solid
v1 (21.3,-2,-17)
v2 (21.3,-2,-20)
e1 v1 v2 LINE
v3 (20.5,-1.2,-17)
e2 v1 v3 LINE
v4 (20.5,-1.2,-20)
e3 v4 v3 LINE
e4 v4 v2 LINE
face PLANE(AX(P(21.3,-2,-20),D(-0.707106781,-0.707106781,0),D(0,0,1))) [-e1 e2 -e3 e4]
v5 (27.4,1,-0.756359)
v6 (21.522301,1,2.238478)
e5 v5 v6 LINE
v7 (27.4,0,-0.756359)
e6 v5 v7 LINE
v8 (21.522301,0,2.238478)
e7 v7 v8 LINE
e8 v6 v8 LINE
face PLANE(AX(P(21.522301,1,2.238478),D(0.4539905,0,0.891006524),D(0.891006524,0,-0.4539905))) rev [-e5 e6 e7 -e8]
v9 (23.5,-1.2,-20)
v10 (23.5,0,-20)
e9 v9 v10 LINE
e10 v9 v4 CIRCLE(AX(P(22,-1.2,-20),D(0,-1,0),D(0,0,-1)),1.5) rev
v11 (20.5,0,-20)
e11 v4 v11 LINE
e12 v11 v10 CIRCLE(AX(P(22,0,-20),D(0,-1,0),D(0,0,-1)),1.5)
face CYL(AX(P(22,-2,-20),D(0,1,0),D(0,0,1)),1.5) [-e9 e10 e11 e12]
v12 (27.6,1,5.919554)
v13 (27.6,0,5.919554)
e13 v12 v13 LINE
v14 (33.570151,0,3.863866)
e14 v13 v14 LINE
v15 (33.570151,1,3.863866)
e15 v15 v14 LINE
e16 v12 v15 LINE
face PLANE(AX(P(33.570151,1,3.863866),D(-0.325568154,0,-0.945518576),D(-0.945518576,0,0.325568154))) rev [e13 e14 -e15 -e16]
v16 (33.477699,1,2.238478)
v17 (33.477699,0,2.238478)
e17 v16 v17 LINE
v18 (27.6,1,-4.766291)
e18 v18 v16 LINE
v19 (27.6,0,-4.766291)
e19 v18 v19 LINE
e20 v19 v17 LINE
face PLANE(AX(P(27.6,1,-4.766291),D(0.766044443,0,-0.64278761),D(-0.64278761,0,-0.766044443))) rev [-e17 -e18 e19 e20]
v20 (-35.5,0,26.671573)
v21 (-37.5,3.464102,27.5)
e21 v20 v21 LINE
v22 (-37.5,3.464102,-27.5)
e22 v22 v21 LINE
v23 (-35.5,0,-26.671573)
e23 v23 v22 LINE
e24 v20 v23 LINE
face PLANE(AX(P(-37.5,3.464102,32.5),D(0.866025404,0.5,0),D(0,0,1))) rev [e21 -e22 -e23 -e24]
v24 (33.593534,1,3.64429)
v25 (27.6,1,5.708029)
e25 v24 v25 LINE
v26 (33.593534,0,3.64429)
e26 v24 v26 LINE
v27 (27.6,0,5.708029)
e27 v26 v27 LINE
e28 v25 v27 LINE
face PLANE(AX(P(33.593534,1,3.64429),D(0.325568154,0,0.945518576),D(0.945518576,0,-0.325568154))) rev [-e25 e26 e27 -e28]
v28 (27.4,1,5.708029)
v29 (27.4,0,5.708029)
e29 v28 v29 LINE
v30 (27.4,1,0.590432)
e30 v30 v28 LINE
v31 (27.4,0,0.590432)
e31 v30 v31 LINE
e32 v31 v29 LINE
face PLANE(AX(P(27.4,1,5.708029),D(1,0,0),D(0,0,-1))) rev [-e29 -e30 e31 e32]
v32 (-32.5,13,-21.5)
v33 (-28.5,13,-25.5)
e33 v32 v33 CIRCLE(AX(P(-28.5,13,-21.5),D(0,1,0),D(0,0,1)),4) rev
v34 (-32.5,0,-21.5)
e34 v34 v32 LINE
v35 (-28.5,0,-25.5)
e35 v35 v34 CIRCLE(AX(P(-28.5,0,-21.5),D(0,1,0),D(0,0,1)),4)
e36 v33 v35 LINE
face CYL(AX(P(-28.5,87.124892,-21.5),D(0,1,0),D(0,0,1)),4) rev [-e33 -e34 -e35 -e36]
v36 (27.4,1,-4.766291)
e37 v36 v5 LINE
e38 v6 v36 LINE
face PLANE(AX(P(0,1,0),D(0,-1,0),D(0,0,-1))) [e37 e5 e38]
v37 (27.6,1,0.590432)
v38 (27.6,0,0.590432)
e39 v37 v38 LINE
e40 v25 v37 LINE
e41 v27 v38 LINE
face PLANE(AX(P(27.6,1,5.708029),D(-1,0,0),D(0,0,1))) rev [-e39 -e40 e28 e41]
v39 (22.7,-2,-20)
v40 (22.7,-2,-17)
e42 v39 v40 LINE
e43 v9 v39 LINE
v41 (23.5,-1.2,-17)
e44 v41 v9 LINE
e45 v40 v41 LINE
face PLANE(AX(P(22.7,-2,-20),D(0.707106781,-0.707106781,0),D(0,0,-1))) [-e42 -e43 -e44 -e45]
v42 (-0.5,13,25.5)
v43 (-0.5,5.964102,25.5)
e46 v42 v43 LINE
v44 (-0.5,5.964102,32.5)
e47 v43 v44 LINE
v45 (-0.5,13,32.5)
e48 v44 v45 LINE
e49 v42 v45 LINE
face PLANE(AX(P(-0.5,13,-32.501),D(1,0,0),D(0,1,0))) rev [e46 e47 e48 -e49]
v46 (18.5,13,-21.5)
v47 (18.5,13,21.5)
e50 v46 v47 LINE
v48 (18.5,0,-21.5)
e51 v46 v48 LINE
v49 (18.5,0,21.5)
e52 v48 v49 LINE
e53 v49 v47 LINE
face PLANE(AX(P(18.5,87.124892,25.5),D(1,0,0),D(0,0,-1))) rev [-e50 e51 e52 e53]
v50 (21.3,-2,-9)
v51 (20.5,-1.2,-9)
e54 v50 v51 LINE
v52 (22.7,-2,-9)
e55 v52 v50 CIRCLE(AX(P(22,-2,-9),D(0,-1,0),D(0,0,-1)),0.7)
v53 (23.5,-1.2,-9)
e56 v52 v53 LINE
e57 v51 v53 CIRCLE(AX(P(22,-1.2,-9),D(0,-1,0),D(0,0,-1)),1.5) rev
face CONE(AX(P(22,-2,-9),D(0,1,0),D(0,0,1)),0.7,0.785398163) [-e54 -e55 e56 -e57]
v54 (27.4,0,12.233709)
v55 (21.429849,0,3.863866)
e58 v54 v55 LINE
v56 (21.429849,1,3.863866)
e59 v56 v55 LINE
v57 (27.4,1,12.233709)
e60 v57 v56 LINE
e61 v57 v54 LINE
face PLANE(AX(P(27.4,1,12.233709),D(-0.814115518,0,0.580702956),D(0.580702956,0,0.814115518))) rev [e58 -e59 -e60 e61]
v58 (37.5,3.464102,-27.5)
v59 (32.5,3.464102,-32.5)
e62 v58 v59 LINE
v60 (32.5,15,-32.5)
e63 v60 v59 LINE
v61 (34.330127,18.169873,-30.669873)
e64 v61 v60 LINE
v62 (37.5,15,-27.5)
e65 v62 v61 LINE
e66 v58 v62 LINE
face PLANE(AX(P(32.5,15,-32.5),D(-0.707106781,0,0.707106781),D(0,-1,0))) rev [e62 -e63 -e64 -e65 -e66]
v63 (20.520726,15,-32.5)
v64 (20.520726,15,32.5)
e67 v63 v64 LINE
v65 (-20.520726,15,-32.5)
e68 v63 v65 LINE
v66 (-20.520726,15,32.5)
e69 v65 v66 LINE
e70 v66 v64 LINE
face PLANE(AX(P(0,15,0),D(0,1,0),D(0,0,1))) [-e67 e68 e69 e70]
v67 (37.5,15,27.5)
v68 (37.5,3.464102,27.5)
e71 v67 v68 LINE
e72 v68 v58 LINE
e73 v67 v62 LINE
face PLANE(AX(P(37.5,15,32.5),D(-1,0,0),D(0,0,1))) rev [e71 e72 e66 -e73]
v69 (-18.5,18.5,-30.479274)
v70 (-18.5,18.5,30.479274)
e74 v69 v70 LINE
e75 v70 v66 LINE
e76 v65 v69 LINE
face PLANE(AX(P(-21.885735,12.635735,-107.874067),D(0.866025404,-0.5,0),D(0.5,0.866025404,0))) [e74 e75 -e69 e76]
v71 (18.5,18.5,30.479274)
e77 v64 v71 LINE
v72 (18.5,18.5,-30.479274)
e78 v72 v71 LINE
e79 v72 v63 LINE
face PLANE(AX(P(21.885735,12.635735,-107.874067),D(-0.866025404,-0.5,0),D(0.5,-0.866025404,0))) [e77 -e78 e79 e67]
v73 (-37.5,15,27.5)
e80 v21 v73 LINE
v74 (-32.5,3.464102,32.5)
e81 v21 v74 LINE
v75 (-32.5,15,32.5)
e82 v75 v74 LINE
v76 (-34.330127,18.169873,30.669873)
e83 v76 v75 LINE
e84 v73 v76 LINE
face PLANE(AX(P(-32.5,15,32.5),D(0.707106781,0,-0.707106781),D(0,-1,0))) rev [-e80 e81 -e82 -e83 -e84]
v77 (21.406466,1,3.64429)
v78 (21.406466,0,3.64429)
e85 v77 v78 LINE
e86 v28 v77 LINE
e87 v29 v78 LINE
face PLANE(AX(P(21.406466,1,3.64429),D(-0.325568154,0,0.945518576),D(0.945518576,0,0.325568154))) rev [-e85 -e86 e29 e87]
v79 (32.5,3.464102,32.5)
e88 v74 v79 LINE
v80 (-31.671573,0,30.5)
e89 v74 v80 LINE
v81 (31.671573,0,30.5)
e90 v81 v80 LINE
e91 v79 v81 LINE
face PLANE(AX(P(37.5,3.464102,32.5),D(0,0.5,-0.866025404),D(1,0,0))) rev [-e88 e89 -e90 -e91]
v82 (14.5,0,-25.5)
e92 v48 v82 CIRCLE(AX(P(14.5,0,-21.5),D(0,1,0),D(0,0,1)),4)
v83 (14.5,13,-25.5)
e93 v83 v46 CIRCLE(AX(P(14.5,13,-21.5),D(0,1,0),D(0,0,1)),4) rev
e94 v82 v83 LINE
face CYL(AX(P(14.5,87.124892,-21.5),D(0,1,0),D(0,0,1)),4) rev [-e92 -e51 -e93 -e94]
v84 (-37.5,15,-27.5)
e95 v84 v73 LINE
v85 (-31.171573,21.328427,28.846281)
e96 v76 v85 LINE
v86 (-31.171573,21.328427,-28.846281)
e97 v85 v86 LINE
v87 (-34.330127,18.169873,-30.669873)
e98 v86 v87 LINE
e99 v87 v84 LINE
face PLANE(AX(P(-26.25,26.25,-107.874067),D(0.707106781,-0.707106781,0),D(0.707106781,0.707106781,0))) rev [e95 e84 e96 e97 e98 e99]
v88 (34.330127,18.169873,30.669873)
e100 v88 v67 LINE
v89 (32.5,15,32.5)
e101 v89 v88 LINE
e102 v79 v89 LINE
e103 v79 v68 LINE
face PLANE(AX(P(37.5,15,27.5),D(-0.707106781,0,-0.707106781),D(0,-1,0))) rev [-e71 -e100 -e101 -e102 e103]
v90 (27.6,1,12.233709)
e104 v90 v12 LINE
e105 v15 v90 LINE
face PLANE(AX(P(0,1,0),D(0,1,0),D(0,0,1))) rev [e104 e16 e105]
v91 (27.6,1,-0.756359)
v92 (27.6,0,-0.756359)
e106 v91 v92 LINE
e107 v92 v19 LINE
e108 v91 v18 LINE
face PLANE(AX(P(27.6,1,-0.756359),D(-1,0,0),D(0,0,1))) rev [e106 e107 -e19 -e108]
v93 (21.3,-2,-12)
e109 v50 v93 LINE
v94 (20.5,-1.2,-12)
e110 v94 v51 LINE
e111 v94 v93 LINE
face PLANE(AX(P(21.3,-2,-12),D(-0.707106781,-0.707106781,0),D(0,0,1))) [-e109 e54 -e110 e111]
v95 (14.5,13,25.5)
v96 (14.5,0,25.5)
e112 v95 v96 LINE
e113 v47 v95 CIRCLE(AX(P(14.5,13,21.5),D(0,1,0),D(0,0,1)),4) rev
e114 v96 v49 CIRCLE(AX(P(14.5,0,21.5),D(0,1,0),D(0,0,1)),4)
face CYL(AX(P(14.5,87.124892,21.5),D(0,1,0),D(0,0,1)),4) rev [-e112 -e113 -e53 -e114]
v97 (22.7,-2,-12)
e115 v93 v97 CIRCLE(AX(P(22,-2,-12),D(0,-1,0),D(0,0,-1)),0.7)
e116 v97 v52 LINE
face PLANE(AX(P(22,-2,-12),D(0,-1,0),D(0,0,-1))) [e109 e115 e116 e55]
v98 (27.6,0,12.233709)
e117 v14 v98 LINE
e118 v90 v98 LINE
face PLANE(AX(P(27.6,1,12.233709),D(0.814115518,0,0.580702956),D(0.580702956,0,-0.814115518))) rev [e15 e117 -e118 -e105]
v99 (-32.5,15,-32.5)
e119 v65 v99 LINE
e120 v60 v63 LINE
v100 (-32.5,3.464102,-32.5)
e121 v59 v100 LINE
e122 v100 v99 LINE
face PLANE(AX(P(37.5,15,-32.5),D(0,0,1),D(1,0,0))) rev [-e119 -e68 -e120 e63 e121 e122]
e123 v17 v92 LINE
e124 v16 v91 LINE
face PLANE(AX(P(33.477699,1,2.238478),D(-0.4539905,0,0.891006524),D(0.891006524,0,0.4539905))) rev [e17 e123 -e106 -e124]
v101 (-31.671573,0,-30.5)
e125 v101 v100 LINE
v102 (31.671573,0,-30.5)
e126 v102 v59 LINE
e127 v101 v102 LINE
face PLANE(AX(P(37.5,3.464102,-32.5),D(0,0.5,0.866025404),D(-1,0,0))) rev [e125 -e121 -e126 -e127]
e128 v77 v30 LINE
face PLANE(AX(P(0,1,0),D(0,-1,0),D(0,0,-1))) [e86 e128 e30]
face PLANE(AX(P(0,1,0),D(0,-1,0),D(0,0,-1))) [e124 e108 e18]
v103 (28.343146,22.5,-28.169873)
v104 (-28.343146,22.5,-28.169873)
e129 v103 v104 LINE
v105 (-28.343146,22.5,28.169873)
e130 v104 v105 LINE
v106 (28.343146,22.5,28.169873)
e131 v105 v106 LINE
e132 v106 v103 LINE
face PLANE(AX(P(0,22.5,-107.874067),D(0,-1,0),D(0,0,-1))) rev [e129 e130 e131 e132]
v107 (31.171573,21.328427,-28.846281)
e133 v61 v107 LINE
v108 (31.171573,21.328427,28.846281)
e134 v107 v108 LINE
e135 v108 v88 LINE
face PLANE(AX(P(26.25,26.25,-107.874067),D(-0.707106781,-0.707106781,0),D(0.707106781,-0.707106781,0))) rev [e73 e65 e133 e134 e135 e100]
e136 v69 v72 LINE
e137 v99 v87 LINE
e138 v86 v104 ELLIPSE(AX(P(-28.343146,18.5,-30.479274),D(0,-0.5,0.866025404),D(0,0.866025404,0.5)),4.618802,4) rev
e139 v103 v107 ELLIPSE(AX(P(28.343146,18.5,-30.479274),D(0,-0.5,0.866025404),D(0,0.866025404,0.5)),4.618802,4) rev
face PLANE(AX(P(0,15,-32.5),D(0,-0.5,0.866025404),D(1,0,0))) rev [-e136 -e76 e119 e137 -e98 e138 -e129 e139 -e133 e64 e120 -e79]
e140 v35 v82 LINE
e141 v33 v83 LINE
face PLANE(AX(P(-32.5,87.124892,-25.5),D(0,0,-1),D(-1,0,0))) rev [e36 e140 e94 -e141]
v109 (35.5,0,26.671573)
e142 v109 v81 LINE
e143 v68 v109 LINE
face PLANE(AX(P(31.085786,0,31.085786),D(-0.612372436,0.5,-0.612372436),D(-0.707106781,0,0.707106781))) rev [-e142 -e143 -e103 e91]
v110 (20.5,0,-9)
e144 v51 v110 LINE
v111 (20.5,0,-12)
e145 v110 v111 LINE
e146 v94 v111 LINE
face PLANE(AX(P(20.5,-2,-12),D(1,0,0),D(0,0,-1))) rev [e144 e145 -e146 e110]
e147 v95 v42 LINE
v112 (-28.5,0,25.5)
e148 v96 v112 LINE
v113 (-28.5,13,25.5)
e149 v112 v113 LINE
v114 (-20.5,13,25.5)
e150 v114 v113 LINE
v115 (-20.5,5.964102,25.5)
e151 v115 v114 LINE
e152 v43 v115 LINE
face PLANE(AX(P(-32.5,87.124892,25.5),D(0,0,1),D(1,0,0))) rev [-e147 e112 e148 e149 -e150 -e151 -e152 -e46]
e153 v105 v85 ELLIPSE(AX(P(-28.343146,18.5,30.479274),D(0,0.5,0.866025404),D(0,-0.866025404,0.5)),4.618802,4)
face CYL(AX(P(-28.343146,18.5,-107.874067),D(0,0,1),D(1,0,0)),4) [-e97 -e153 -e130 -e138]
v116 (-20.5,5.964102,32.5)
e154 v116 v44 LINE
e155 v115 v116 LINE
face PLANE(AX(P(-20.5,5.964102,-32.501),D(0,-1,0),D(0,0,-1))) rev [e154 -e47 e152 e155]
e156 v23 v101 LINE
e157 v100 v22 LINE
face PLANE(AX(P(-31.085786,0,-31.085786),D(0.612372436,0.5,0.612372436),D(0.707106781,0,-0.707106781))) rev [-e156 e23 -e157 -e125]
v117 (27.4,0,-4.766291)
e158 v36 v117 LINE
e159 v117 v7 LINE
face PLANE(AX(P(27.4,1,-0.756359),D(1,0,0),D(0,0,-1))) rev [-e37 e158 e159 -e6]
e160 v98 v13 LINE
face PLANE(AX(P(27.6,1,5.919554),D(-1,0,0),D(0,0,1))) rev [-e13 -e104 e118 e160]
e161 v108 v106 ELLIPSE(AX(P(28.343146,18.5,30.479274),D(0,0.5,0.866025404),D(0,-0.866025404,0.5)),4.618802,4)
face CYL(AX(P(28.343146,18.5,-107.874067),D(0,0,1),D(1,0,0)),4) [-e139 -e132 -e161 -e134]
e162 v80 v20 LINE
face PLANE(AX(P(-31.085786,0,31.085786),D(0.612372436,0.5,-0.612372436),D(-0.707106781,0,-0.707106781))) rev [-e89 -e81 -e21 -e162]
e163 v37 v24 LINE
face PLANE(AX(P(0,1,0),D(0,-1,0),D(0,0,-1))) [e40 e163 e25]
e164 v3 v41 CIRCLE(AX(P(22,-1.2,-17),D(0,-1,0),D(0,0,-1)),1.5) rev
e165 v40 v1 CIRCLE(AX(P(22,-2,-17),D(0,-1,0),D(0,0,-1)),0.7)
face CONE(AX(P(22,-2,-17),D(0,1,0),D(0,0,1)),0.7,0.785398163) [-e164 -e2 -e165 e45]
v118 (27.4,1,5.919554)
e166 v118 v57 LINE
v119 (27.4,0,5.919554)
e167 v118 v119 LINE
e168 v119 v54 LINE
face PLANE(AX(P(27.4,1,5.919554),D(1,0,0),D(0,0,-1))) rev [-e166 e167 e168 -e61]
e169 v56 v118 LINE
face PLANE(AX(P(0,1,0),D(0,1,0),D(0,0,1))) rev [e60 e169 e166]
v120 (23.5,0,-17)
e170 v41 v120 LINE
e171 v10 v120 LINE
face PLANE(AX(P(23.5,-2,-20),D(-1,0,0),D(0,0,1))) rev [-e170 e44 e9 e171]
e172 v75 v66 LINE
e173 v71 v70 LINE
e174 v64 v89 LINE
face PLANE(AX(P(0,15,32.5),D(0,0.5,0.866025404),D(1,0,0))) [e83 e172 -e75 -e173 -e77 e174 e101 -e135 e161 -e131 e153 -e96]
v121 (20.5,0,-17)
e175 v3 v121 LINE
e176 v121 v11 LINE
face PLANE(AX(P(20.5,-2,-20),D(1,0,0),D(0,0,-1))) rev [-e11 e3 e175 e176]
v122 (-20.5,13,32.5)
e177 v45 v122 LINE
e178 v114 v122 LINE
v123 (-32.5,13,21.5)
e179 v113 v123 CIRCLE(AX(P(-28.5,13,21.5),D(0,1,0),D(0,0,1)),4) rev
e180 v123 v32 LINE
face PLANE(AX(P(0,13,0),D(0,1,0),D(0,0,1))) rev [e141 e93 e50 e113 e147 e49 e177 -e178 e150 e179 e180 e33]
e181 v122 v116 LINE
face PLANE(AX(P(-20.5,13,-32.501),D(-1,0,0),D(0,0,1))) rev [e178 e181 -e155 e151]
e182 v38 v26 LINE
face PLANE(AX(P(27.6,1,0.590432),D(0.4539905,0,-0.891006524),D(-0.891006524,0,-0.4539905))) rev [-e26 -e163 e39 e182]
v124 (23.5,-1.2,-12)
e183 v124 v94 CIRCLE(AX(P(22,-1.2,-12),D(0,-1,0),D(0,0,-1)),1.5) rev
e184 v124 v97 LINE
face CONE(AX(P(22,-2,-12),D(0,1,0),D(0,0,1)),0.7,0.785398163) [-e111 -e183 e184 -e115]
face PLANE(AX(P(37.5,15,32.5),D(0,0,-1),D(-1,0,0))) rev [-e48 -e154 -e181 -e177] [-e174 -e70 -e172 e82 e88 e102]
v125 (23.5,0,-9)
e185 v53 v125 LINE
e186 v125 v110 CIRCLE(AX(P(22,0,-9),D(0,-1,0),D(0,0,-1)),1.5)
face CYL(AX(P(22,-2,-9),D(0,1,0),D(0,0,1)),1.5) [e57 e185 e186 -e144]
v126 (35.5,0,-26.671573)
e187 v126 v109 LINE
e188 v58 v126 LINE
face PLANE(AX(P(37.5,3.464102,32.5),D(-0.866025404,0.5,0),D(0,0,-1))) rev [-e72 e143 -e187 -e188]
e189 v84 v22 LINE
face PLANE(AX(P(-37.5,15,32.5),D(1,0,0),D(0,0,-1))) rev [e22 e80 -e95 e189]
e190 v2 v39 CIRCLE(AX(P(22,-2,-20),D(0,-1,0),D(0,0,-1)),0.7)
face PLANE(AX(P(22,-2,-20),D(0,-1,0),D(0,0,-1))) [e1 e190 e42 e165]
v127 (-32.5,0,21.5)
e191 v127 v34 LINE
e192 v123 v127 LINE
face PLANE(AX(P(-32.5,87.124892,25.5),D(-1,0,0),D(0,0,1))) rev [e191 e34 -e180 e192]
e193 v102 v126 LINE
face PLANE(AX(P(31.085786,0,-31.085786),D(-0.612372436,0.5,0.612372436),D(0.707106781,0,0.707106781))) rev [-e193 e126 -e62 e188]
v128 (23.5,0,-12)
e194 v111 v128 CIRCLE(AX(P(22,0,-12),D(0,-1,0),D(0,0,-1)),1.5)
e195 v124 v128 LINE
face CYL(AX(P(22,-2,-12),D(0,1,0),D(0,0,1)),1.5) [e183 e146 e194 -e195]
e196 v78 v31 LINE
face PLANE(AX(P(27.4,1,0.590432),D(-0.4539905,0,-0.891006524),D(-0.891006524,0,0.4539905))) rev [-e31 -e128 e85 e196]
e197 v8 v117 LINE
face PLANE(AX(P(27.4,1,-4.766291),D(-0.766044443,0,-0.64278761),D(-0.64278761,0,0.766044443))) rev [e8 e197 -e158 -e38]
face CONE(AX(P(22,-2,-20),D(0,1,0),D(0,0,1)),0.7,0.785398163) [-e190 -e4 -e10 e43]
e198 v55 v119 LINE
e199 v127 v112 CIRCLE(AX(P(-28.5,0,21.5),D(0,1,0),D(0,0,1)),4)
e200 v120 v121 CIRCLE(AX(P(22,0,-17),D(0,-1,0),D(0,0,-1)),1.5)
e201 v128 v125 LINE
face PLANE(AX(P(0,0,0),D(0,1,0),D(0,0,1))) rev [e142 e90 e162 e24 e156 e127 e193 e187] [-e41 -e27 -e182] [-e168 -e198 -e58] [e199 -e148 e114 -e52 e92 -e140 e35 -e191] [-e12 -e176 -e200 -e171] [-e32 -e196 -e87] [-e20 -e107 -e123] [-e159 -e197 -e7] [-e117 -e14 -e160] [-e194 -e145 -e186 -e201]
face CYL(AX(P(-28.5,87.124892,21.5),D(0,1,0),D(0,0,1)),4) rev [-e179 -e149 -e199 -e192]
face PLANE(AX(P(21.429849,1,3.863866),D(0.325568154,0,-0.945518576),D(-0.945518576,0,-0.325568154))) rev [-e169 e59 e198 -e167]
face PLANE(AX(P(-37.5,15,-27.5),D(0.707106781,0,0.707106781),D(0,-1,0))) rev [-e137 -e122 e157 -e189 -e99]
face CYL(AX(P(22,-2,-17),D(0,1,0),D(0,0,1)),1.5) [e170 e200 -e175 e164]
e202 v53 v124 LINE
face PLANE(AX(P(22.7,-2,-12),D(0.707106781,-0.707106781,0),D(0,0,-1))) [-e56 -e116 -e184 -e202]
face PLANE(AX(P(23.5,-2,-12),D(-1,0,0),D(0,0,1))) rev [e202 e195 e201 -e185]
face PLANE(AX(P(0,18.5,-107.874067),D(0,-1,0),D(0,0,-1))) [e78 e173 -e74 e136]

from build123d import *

# Parameters (mm, degrees)
SKETCH2_W           = 75
SKETCH2_H           = 65
BOSS_EXTRUDE1_DEPTH = 15
BOSS_EXTRUDE3_START = -5
BOSS_EXTRUDE3_DEPTH = 55
CHAMFER1_SIZE       = 5
CHAMFER1_SIZE_2     = 8.660254038
CHAMFER2_SIZE       = 8.660254038
CHAMFER2_SIZE_2     = 5
FILLET3_R           = 4
SKETCH5_W           = 51
SKETCH5_H           = 51
CUT_EXTRUDE2_DEPTH  = 13
CHAMFER3_SIZE       = 5
FILLET4_R           = 4
CUT_EXTRUDE3_DEPTH  = 1
BOSS_EXTRUDE4_DEPTH = 2
CHAMFER5_SIZE       = 0.8
CHAMFER6_SIZE       = 2
CHAMFER6_SIZE2      = 3.464101615
CUT_EXTRUDE4_REACH  = 80.342
SKETCH10_W          = 20
SKETCH10_H          = 7.035898385


with BuildPart() as part:
    # Sketch2 → Boss-Extrude1 (new body)
    with BuildSketch(Plane(origin=(0, 0, 0), x_dir=(1, 0, 0), z_dir=(0, 1, 0))):
        Rectangle(SKETCH2_W, SKETCH2_H)
    extrude(amount=BOSS_EXTRUDE1_DEPTH)

    # Sketch4 → Boss-Extrude3 (add)
    with BuildSketch(Plane.XY.offset(32.5).offset(BOSS_EXTRUDE3_START)):
        Polygon((-30, 22.5), (-37.5, 15), (-20.520725942, 15), (-18.5, 18.5), (18.5, 18.5), (20.520725942, 15), (37.5, 15), (30, 22.5), align=None)
    extrude(amount=-BOSS_EXTRUDE3_DEPTH)

    # Chamfer1
    # the kernel refuses this chamfer: 8.660254038, 5 mm, written as the material it adds along each edge
    with BuildSketch(Plane(origin=(-37.5, 15, -27.5), x_dir=(0, -0.05789386240267149, -0.9983227437537926), z_dir=(1, 0, 0))) as chamfer1_piece_1_section:
        Polygon((CHAMFER1_SIZE * 0.998322743754, CHAMFER1_SIZE * 0.0578938624027), (-CHAMFER1_SIZE_2 * 0.0578938624016, CHAMFER1_SIZE_2 * 0.998322743736), (0, 0), align=None)
    chamfer1_piece_1 = extrude(amount=39.384093911, mode=Mode.PRIVATE)
    chamfer1_piece_1 = split(chamfer1_piece_1, bisect_by=Plane(origin=(-27.856272833, 16.457627442, -32.5), z_dir=(0, 0, 1)), keep=Keep.TOP, mode=Mode.PRIVATE)
    chamfer1_piece_1 = split(chamfer1_piece_1, bisect_by=Plane(origin=(-21.723441468, 12.916835603, -29.537993549), z_dir=(-0.8660254037844403, 0.49999999999999734, 0)), keep=Keep.TOP, mode=Mode.PRIVATE)
    chamfer1_piece_1 = split(chamfer1_piece_1, bisect_by=Plane(origin=(-31.949322695, 20.550677305, -29.537993549), z_dir=(0.7071067811865487, -0.7071067811865464, 0)), keep=Keep.TOP, mode=Mode.PRIVATE)
    chamfer1_piece_1 = split(chamfer1_piece_1, bisect_by=Plane(origin=(-27.856272833, 18.5, -29.537993549), z_dir=(0, -1, 0)), keep=Keep.TOP, mode=Mode.PRIVATE)
    add(chamfer1_piece_1)
    with BuildSketch(Plane(origin=(-37.5, 15, -27.5), x_dir=(0, -0.05789386240267149, -0.9983227437537926), z_dir=(1, 0, 0))) as chamfer1_piece_2_section:
        Polygon((CHAMFER1_SIZE * 0.998322743754, CHAMFER1_SIZE * 0.0578938624027), (-CHAMFER1_SIZE_2 * 0.0578938624016, CHAMFER1_SIZE_2 * 0.998322743736), (0, 0), align=None)
    chamfer1_piece_2 = extrude(amount=39.384093911, mode=Mode.PRIVATE)
    chamfer1_piece_2 = split(chamfer1_piece_2, bisect_by=Plane(origin=(-19.426417994, 16.895396965, -28.430435977), z_dir=(-0.8660254037844403, 0.49999999999999734, 0)), keep=Keep.TOP, mode=Mode.PRIVATE)
    chamfer1_piece_2 = split(chamfer1_piece_2, bisect_by=Plane(origin=(-28.690098083, 23.809901917, -28.430435977), z_dir=(0.7071067811865487, -0.7071067811865464, 0)), keep=Keep.TOP, mode=Mode.PRIVATE)
    chamfer1_piece_2 = split(chamfer1_piece_2, bisect_by=Plane(origin=(-24.984626048, 22.5, -28.430435977), z_dir=(0, -1, 0)), keep=Keep.TOP, mode=Mode.PRIVATE)
    chamfer1_piece_2 = split(chamfer1_piece_2, bisect_by=Plane(origin=(-24.984626048, 18.5, -28.430435977), z_dir=(0, 1, 0)), keep=Keep.TOP, mode=Mode.PRIVATE)
    add(chamfer1_piece_2)
    with BuildSketch(Plane(origin=(-37.5, 15, -27.5), x_dir=(0, -0.05789386240267149, -0.9983227437537926), z_dir=(1, 0, 0))) as chamfer1_piece_3_section:
        Polygon((CHAMFER1_SIZE * 0.998322743754, CHAMFER1_SIZE * 0.0578938624027), (-CHAMFER1_SIZE_2 * 0.0578938624016, CHAMFER1_SIZE_2 * 0.998322743736), (0, 0), align=None)
    chamfer1_piece_3 = extrude(amount=39.384093911, mode=Mode.PRIVATE)
    chamfer1_piece_3 = split(chamfer1_piece_3, bisect_by=Plane(origin=(-15.142166091, 24.315938934, -28.430858153), z_dir=(0.8660254037844403, -0.49999999999999734, 0)), keep=Keep.TOP, mode=Mode.PRIVATE)
    chamfer1_piece_3 = split(chamfer1_piece_3, bisect_by=Plane(origin=(-7.845197519, 22.5, -28.430858153), z_dir=(0, -1, 0)), keep=Keep.TOP, mode=Mode.PRIVATE)
    chamfer1_piece_3 = split(chamfer1_piece_3, bisect_by=Plane(origin=(-7.845197519, 18.5, -28.430858153), z_dir=(0, 1, 0)), keep=Keep.TOP, mode=Mode.PRIVATE)
    add(chamfer1_piece_3)
    with BuildSketch(Plane(origin=(-1.884093911, 15, -27.5), x_dir=(0, -0.05789386240267149, -0.9983227437537926), z_dir=(1, 0, 0))) as chamfer1_piece_4_section:
        Polygon((CHAMFER1_SIZE * 0.998322743754, CHAMFER1_SIZE * 0.0578938624027), (-CHAMFER1_SIZE_2 * 0.0578938624016, CHAMFER1_SIZE_2 * 0.998322743736), (0, 0), align=None)
    chamfer1_piece_4 = extrude(amount=39.384093911, mode=Mode.PRIVATE)
    chamfer1_piece_4 = split(chamfer1_piece_4, bisect_by=Plane(origin=(15.142166091, 24.315938934, -28.430858153), z_dir=(-0.8660254037844395, -0.4999999999999986, 0)), keep=Keep.TOP, mode=Mode.PRIVATE)
    chamfer1_piece_4 = split(chamfer1_piece_4, bisect_by=Plane(origin=(7.845197519, 22.5, -28.430858153), z_dir=(0, -1, 0)), keep=Keep.TOP, mode=Mode.PRIVATE)
    chamfer1_piece_4 = split(chamfer1_piece_4, bisect_by=Plane(origin=(7.845197519, 18.5, -28.430858153), z_dir=(0, 1, 0)), keep=Keep.TOP, mode=Mode.PRIVATE)
    add(chamfer1_piece_4)
    with BuildSketch(Plane(origin=(-1.884093911, 15, -27.5), x_dir=(0, -0.05789386240267149, -0.9983227437537926), z_dir=(1, 0, 0))) as chamfer1_piece_5_section:
        Polygon((CHAMFER1_SIZE * 0.998322743754, CHAMFER1_SIZE * 0.0578938624027), (-CHAMFER1_SIZE_2 * 0.0578938624016, CHAMFER1_SIZE_2 * 0.998322743736), (0, 0), align=None)
    chamfer1_piece_5 = extrude(amount=39.384093911, mode=Mode.PRIVATE)
    chamfer1_piece_5 = split(chamfer1_piece_5, bisect_by=Plane(origin=(21.723441468, 12.916835603, -29.537993549), z_dir=(0.8660254037844395, 0.4999999999999986, 0)), keep=Keep.TOP, mode=Mode.PRIVATE)
    chamfer1_piece_5 = split(chamfer1_piece_5, bisect_by=Plane(origin=(27.856272833, 16.457627442, -32.5), z_dir=(0, 0, 1)), keep=Keep.TOP, mode=Mode.PRIVATE)
    chamfer1_piece_5 = split(chamfer1_piece_5, bisect_by=Plane(origin=(31.949322695, 20.550677305, -29.537993549), z_dir=(-0.7071067811865489, -0.7071067811865462, 0)), keep=Keep.TOP, mode=Mode.PRIVATE)
    chamfer1_piece_5 = split(chamfer1_piece_5, bisect_by=Plane(origin=(27.856272833, 18.5, -29.537993549), z_dir=(0, -1, 0)), keep=Keep.TOP, mode=Mode.PRIVATE)
    add(chamfer1_piece_5)
    with BuildSketch(Plane(origin=(-1.884093911, 15, -27.5), x_dir=(0, -0.05789386240267149, -0.9983227437537926), z_dir=(1, 0, 0))) as chamfer1_piece_6_section:
        Polygon((CHAMFER1_SIZE * 0.998322743754, CHAMFER1_SIZE * 0.0578938624027), (-CHAMFER1_SIZE_2 * 0.0578938624016, CHAMFER1_SIZE_2 * 0.998322743736), (0, 0), align=None)
    chamfer1_piece_6 = extrude(amount=39.384093911, mode=Mode.PRIVATE)
    chamfer1_piece_6 = split(chamfer1_piece_6, bisect_by=Plane(origin=(19.426417994, 16.895396965, -28.430435977), z_dir=(0.8660254037844395, 0.4999999999999986, 0)), keep=Keep.TOP, mode=Mode.PRIVATE)
    chamfer1_piece_6 = split(chamfer1_piece_6, bisect_by=Plane(origin=(28.690098083, 23.809901917, -28.430435977), z_dir=(-0.7071067811865489, -0.7071067811865462, 0)), keep=Keep.TOP, mode=Mode.PRIVATE)
    chamfer1_piece_6 = split(chamfer1_piece_6, bisect_by=Plane(origin=(24.984626048, 22.5, -28.430435977), z_dir=(0, -1, 0)), keep=Keep.TOP, mode=Mode.PRIVATE)
    chamfer1_piece_6 = split(chamfer1_piece_6, bisect_by=Plane(origin=(24.984626048, 18.5, -28.430435977), z_dir=(0, 1, 0)), keep=Keep.TOP, mode=Mode.PRIVATE)
    add(chamfer1_piece_6)

    # Chamfer2
    # the kernel refuses this chamfer: 8.660254038, 5 mm, written as the material it adds along each edge
    with BuildSketch(Plane(origin=(-37.5, 15, 27.5), x_dir=(0, 0.9998132206222078, -0.019326765612700497), z_dir=(1, 0, 0))) as chamfer2_piece_1_section:
        Polygon((CHAMFER2_SIZE * 0.999813220604, CHAMFER2_SIZE * 0.0193267656124), (-CHAMFER2_SIZE_2 * 0.0193267656127, CHAMFER2_SIZE_2 * 0.999813220622), (0, 0), align=None)
    chamfer2_piece_1 = extrude(amount=39.384093911, mode=Mode.PRIVATE)
    chamfer2_piece_1 = split(chamfer2_piece_1, bisect_by=Plane(origin=(-24.984626048, 22.5, 28.430435977), z_dir=(0, -1, 0)), keep=Keep.TOP, mode=Mode.PRIVATE)
    chamfer2_piece_1 = split(chamfer2_piece_1, bisect_by=Plane(origin=(-28.690098083, 23.809901917, 28.430435977), z_dir=(0.7071067811865476, -0.7071067811865476, 0)), keep=Keep.TOP, mode=Mode.PRIVATE)
    chamfer2_piece_1 = split(chamfer2_piece_1, bisect_by=Plane(origin=(-19.426417994, 16.895396965, 28.430435977), z_dir=(-0.866025403784329, 0.50000000000019, 0)), keep=Keep.TOP, mode=Mode.PRIVATE)
    chamfer2_piece_1 = split(chamfer2_piece_1, bisect_by=Plane(origin=(-24.984626048, 18.5, 28.430435977), z_dir=(0, 1, 0)), keep=Keep.TOP, mode=Mode.PRIVATE)
    add(chamfer2_piece_1)
    with BuildSketch(Plane(origin=(-37.5, 15, 27.5), x_dir=(0, 0.9998132206222078, -0.019326765612700497), z_dir=(1, 0, 0))) as chamfer2_piece_2_section:
        Polygon((CHAMFER2_SIZE * 0.999813220604, CHAMFER2_SIZE * 0.0193267656124), (-CHAMFER2_SIZE_2 * 0.0193267656127, CHAMFER2_SIZE_2 * 0.999813220622), (0, 0), align=None)
    chamfer2_piece_2 = extrude(amount=39.384093911, mode=Mode.PRIVATE)
    chamfer2_piece_2 = split(chamfer2_piece_2, bisect_by=Plane(origin=(-31.949322695, 20.550677305, 29.537993549), z_dir=(0.7071067811865476, -0.7071067811865476, 0)), keep=Keep.TOP, mode=Mode.PRIVATE)
    chamfer2_piece_2 = split(chamfer2_piece_2, bisect_by=Plane(origin=(-21.723441468, 12.916835603, 29.537993549), z_dir=(-0.866025403784329, 0.50000000000019, 0)), keep=Keep.TOP, mode=Mode.PRIVATE)
    chamfer2_piece_2 = split(chamfer2_piece_2, bisect_by=Plane(origin=(-27.856272833, 18.5, 29.537993549), z_dir=(0, -1, 0)), keep=Keep.TOP, mode=Mode.PRIVATE)
    chamfer2_piece_2 = split(chamfer2_piece_2, bisect_by=Plane(origin=(-27.856272833, 16.457627442, 32.5), z_dir=(0, 0, -1)), keep=Keep.TOP, mode=Mode.PRIVATE)
    add(chamfer2_piece_2)
    with BuildSketch(Plane(origin=(-37.5, 15, 27.5), x_dir=(0, 0.9998132206222078, -0.019326765612700497), z_dir=(1, 0, 0))) as chamfer2_piece_3_section:
        Polygon((CHAMFER2_SIZE * 0.999813220604, CHAMFER2_SIZE * 0.0193267656124), (-CHAMFER2_SIZE_2 * 0.0193267656127, CHAMFER2_SIZE_2 * 0.999813220622), (0, 0), align=None)
    chamfer2_piece_3 = extrude(amount=39.384093911, mode=Mode.PRIVATE)
    chamfer2_piece_3 = split(chamfer2_piece_3, bisect_by=Plane(origin=(-7.845197519, 22.5, 28.430858153), z_dir=(0, -1, 0)), keep=Keep.TOP, mode=Mode.PRIVATE)
    chamfer2_piece_3 = split(chamfer2_piece_3, bisect_by=Plane(origin=(-15.142166091, 24.315938934, 28.430858153), z_dir=(0.866025403784329, -0.50000000000019, 0)), keep=Keep.TOP, mode=Mode.PRIVATE)
    chamfer2_piece_3 = split(chamfer2_piece_3, bisect_by=Plane(origin=(-7.845197519, 18.5, 28.430858153), z_dir=(0, 1, 0)), keep=Keep.TOP, mode=Mode.PRIVATE)
    add(chamfer2_piece_3)
    with BuildSketch(Plane(origin=(-1.884093911, 15, 27.5), x_dir=(0, 0.9998132206222078, -0.019326765612700497), z_dir=(1, 0, 0))) as chamfer2_piece_4_section:
        Polygon((CHAMFER2_SIZE * 0.999813220604, CHAMFER2_SIZE * 0.0193267656124), (-CHAMFER2_SIZE_2 * 0.0193267656127, CHAMFER2_SIZE_2 * 0.999813220622), (0, 0), align=None)
    chamfer2_piece_4 = extrude(amount=39.384093911, mode=Mode.PRIVATE)
    chamfer2_piece_4 = split(chamfer2_piece_4, bisect_by=Plane(origin=(7.845197519, 22.5, 28.430858153), z_dir=(0, -1, 0)), keep=Keep.TOP, mode=Mode.PRIVATE)
    chamfer2_piece_4 = split(chamfer2_piece_4, bisect_by=Plane(origin=(7.845197519, 18.5, 28.430858153), z_dir=(0, 1, 0)), keep=Keep.TOP, mode=Mode.PRIVATE)
    chamfer2_piece_4 = split(chamfer2_piece_4, bisect_by=Plane(origin=(15.142166091, 24.315938934, 28.430858153), z_dir=(-0.866025403784329, -0.50000000000019, 0)), keep=Keep.TOP, mode=Mode.PRIVATE)
    add(chamfer2_piece_4)
    with BuildSketch(Plane(origin=(-1.884093911, 15, 27.5), x_dir=(0, 0.9998132206222078, -0.019326765612700497), z_dir=(1, 0, 0))) as chamfer2_piece_5_section:
        Polygon((CHAMFER2_SIZE * 0.999813220604, CHAMFER2_SIZE * 0.0193267656124), (-CHAMFER2_SIZE_2 * 0.0193267656127, CHAMFER2_SIZE_2 * 0.999813220622), (0, 0), align=None)
    chamfer2_piece_5 = extrude(amount=39.384093911, mode=Mode.PRIVATE)
    chamfer2_piece_5 = split(chamfer2_piece_5, bisect_by=Plane(origin=(28.690098083, 23.809901917, 28.430435977), z_dir=(-0.7071067811865476, -0.7071067811865476, 0)), keep=Keep.TOP, mode=Mode.PRIVATE)
    chamfer2_piece_5 = split(chamfer2_piece_5, bisect_by=Plane(origin=(24.984626048, 22.5, 28.430435977), z_dir=(0, -1, 0)), keep=Keep.TOP, mode=Mode.PRIVATE)
    chamfer2_piece_5 = split(chamfer2_piece_5, bisect_by=Plane(origin=(24.984626048, 18.5, 28.430435977), z_dir=(0, 1, 0)), keep=Keep.TOP, mode=Mode.PRIVATE)
    chamfer2_piece_5 = split(chamfer2_piece_5, bisect_by=Plane(origin=(19.426417994, 16.895396965, 28.430435977), z_dir=(0.866025403784329, 0.50000000000019, 0)), keep=Keep.TOP, mode=Mode.PRIVATE)
    add(chamfer2_piece_5)
    with BuildSketch(Plane(origin=(-1.884093911, 15, 27.5), x_dir=(0, 0.9998132206222078, -0.019326765612700497), z_dir=(1, 0, 0))) as chamfer2_piece_6_section:
        Polygon((CHAMFER2_SIZE * 0.999813220604, CHAMFER2_SIZE * 0.0193267656124), (-CHAMFER2_SIZE_2 * 0.0193267656127, CHAMFER2_SIZE_2 * 0.999813220622), (0, 0), align=None)
    chamfer2_piece_6 = extrude(amount=39.384093911, mode=Mode.PRIVATE)
    chamfer2_piece_6 = split(chamfer2_piece_6, bisect_by=Plane(origin=(31.949322695, 20.550677305, 29.537993549), z_dir=(-0.7071067811865476, -0.7071067811865476, 0)), keep=Keep.TOP, mode=Mode.PRIVATE)
    chamfer2_piece_6 = split(chamfer2_piece_6, bisect_by=Plane(origin=(27.856272833, 18.5, 29.537993549), z_dir=(0, -1, 0)), keep=Keep.TOP, mode=Mode.PRIVATE)
    chamfer2_piece_6 = split(chamfer2_piece_6, bisect_by=Plane(origin=(21.723441468, 12.916835603, 29.537993549), z_dir=(0.866025403784329, 0.50000000000019, 0)), keep=Keep.TOP, mode=Mode.PRIVATE)
    chamfer2_piece_6 = split(chamfer2_piece_6, bisect_by=Plane(origin=(27.856272833, 16.457627442, 32.5), z_dir=(0, 0, -1)), keep=Keep.TOP, mode=Mode.PRIVATE)
    add(chamfer2_piece_6)

    # Fillet3
    fillet3_edges = [part.edges().sort_by_distance(p)[0] for p in [
        (-30, 22.5, 0),
        (30, 22.5, 0),
    ]]
    fillet(fillet3_edges, radius=FILLET3_R)

    # Sketch5 → Cut-Extrude2 (cut)
    with BuildSketch(Plane.XZ):
        with Locations((-7, 0)):
            Rectangle(SKETCH5_W, SKETCH5_H)
    extrude(amount=-CUT_EXTRUDE2_DEPTH, mode=Mode.SUBTRACT)

    # Chamfer3
    chamfer3_edges = [part.edges().sort_by_distance(p)[0] for p in [
        (-37.5, 7.5, -32.5),
        (37.5, 7.5, -32.5),
        (37.5, 7.5, 32.5),
        (-37.5, 7.5, 32.5),
    ]]
    chamfer(chamfer3_edges, length=CHAMFER3_SIZE)

    # Fillet4
    fillet4_edges = [part.edges().sort_by_distance(p)[0] for p in [
        (18.5, 6.5, -25.5),
        (18.5, 6.5, 25.5),
        (-32.5, 6.5, 25.5),
        (-32.5, 6.5, -25.5),
    ]]
    fillet(fillet4_edges, radius=FILLET4_R)

    # Sketch7 → Cut-Extrude3 (cut)
    with BuildSketch(Plane.XZ):
        Polygon((27.4, 12.233709128), (21.42984865, 3.863865625), (27.4, 5.91955359), align=None)
        Polygon((21.406466325, 3.644290309), (27.4, 5.708029454), (27.4, 0.590432369), align=None)
        Polygon((21.52230088, 2.23847817), (27.4, -0.756359116), (27.4, -4.766290872), align=None)
        Polygon((27.6, 5.708029454), (27.6, 0.590432369), (33.593533675, 3.644290309), align=None)
        Polygon((27.6, -0.756359116), (27.6, -4.766290872), (33.47769912, 2.23847817), align=None)
        Polygon((33.57015135, 3.863865625), (27.6, 5.91955359), (27.6, 12.233709128), align=None)
    extrude(amount=-CUT_EXTRUDE3_DEPTH, mode=Mode.SUBTRACT)

    # Sketch9 → Boss-Extrude4 (add)
    with BuildSketch(Plane.XZ):
        with BuildLine():
            Line((20.5, -12), (20.5, -9))
            ThreePointArc((20.5, -9), (22, -7.5), (23.5, -9))
            Line((23.5, -9), (23.5, -12))
            ThreePointArc((23.5, -12), (22, -13.5), (20.5, -12))
        make_face()
        with BuildLine():
            Line((20.5, -20), (20.5, -17))
            ThreePointArc((20.5, -17), (22, -15.5), (23.5, -17))
            Line((23.5, -17), (23.5, -20))
            ThreePointArc((23.5, -20), (22, -21.5), (20.5, -20))
        make_face()
    extrude(amount=BOSS_EXTRUDE4_DEPTH)

    # Chamfer5
    chamfer5_edges = [part.edges().sort_by_distance(p)[0] for p in [
        (22, -2, -13.5),
        (23.5, -2, -10.5),
        (22, -2, -7.5),
        (20.5, -2, -10.5),
        (22, -2, -21.5),
        (23.5, -2, -18.5),
        (22, -2, -15.5),
        (20.5, -2, -18.5),
    ]]
    chamfer(chamfer5_edges, length=CHAMFER5_SIZE)

    # Chamfer6
    chamfer6_edges = [part.edges().sort_by_distance(p)[0] for p in [
        (37.5, 0, 0),
        (-37.5, 0, 0),
        (0, 0, -32.5),
        (0, 0, 32.5),
        (35, 0, -30),
        (-35, 0, -30),
        (-35, 0, 30),
        (35, 0, 30),
    ]]
    chamfer6_side = [part.faces().sort_by_distance(p)[0] for p in [
        (0, 0, 31.507528338),
    ]]
    chamfer(chamfer6_edges, length=CHAMFER6_SIZE, length2=CHAMFER6_SIZE2, reference=chamfer6_side[0])

    # Sketch10 → Cut-Extrude4 (cut, up to next)
    with BuildSketch(Plane.XY.offset(32.5), mode=Mode.PRIVATE) as cut_extrude4_sk1:
        with Locations((-10.5, 9.482050808)):
            Rectangle(SKETCH10_W, SKETCH10_H)
    cut_extrude4_tool1 = extrude(cut_extrude4_sk1.sketch, amount=-CUT_EXTRUDE4_REACH, mode=Mode.PRIVATE) & part.part
    add(cut_extrude4_tool1.solids().sort_by_distance((-10.5, 9.482051, 32.5))[0], mode=Mode.SUBTRACT)


solid = part.part
